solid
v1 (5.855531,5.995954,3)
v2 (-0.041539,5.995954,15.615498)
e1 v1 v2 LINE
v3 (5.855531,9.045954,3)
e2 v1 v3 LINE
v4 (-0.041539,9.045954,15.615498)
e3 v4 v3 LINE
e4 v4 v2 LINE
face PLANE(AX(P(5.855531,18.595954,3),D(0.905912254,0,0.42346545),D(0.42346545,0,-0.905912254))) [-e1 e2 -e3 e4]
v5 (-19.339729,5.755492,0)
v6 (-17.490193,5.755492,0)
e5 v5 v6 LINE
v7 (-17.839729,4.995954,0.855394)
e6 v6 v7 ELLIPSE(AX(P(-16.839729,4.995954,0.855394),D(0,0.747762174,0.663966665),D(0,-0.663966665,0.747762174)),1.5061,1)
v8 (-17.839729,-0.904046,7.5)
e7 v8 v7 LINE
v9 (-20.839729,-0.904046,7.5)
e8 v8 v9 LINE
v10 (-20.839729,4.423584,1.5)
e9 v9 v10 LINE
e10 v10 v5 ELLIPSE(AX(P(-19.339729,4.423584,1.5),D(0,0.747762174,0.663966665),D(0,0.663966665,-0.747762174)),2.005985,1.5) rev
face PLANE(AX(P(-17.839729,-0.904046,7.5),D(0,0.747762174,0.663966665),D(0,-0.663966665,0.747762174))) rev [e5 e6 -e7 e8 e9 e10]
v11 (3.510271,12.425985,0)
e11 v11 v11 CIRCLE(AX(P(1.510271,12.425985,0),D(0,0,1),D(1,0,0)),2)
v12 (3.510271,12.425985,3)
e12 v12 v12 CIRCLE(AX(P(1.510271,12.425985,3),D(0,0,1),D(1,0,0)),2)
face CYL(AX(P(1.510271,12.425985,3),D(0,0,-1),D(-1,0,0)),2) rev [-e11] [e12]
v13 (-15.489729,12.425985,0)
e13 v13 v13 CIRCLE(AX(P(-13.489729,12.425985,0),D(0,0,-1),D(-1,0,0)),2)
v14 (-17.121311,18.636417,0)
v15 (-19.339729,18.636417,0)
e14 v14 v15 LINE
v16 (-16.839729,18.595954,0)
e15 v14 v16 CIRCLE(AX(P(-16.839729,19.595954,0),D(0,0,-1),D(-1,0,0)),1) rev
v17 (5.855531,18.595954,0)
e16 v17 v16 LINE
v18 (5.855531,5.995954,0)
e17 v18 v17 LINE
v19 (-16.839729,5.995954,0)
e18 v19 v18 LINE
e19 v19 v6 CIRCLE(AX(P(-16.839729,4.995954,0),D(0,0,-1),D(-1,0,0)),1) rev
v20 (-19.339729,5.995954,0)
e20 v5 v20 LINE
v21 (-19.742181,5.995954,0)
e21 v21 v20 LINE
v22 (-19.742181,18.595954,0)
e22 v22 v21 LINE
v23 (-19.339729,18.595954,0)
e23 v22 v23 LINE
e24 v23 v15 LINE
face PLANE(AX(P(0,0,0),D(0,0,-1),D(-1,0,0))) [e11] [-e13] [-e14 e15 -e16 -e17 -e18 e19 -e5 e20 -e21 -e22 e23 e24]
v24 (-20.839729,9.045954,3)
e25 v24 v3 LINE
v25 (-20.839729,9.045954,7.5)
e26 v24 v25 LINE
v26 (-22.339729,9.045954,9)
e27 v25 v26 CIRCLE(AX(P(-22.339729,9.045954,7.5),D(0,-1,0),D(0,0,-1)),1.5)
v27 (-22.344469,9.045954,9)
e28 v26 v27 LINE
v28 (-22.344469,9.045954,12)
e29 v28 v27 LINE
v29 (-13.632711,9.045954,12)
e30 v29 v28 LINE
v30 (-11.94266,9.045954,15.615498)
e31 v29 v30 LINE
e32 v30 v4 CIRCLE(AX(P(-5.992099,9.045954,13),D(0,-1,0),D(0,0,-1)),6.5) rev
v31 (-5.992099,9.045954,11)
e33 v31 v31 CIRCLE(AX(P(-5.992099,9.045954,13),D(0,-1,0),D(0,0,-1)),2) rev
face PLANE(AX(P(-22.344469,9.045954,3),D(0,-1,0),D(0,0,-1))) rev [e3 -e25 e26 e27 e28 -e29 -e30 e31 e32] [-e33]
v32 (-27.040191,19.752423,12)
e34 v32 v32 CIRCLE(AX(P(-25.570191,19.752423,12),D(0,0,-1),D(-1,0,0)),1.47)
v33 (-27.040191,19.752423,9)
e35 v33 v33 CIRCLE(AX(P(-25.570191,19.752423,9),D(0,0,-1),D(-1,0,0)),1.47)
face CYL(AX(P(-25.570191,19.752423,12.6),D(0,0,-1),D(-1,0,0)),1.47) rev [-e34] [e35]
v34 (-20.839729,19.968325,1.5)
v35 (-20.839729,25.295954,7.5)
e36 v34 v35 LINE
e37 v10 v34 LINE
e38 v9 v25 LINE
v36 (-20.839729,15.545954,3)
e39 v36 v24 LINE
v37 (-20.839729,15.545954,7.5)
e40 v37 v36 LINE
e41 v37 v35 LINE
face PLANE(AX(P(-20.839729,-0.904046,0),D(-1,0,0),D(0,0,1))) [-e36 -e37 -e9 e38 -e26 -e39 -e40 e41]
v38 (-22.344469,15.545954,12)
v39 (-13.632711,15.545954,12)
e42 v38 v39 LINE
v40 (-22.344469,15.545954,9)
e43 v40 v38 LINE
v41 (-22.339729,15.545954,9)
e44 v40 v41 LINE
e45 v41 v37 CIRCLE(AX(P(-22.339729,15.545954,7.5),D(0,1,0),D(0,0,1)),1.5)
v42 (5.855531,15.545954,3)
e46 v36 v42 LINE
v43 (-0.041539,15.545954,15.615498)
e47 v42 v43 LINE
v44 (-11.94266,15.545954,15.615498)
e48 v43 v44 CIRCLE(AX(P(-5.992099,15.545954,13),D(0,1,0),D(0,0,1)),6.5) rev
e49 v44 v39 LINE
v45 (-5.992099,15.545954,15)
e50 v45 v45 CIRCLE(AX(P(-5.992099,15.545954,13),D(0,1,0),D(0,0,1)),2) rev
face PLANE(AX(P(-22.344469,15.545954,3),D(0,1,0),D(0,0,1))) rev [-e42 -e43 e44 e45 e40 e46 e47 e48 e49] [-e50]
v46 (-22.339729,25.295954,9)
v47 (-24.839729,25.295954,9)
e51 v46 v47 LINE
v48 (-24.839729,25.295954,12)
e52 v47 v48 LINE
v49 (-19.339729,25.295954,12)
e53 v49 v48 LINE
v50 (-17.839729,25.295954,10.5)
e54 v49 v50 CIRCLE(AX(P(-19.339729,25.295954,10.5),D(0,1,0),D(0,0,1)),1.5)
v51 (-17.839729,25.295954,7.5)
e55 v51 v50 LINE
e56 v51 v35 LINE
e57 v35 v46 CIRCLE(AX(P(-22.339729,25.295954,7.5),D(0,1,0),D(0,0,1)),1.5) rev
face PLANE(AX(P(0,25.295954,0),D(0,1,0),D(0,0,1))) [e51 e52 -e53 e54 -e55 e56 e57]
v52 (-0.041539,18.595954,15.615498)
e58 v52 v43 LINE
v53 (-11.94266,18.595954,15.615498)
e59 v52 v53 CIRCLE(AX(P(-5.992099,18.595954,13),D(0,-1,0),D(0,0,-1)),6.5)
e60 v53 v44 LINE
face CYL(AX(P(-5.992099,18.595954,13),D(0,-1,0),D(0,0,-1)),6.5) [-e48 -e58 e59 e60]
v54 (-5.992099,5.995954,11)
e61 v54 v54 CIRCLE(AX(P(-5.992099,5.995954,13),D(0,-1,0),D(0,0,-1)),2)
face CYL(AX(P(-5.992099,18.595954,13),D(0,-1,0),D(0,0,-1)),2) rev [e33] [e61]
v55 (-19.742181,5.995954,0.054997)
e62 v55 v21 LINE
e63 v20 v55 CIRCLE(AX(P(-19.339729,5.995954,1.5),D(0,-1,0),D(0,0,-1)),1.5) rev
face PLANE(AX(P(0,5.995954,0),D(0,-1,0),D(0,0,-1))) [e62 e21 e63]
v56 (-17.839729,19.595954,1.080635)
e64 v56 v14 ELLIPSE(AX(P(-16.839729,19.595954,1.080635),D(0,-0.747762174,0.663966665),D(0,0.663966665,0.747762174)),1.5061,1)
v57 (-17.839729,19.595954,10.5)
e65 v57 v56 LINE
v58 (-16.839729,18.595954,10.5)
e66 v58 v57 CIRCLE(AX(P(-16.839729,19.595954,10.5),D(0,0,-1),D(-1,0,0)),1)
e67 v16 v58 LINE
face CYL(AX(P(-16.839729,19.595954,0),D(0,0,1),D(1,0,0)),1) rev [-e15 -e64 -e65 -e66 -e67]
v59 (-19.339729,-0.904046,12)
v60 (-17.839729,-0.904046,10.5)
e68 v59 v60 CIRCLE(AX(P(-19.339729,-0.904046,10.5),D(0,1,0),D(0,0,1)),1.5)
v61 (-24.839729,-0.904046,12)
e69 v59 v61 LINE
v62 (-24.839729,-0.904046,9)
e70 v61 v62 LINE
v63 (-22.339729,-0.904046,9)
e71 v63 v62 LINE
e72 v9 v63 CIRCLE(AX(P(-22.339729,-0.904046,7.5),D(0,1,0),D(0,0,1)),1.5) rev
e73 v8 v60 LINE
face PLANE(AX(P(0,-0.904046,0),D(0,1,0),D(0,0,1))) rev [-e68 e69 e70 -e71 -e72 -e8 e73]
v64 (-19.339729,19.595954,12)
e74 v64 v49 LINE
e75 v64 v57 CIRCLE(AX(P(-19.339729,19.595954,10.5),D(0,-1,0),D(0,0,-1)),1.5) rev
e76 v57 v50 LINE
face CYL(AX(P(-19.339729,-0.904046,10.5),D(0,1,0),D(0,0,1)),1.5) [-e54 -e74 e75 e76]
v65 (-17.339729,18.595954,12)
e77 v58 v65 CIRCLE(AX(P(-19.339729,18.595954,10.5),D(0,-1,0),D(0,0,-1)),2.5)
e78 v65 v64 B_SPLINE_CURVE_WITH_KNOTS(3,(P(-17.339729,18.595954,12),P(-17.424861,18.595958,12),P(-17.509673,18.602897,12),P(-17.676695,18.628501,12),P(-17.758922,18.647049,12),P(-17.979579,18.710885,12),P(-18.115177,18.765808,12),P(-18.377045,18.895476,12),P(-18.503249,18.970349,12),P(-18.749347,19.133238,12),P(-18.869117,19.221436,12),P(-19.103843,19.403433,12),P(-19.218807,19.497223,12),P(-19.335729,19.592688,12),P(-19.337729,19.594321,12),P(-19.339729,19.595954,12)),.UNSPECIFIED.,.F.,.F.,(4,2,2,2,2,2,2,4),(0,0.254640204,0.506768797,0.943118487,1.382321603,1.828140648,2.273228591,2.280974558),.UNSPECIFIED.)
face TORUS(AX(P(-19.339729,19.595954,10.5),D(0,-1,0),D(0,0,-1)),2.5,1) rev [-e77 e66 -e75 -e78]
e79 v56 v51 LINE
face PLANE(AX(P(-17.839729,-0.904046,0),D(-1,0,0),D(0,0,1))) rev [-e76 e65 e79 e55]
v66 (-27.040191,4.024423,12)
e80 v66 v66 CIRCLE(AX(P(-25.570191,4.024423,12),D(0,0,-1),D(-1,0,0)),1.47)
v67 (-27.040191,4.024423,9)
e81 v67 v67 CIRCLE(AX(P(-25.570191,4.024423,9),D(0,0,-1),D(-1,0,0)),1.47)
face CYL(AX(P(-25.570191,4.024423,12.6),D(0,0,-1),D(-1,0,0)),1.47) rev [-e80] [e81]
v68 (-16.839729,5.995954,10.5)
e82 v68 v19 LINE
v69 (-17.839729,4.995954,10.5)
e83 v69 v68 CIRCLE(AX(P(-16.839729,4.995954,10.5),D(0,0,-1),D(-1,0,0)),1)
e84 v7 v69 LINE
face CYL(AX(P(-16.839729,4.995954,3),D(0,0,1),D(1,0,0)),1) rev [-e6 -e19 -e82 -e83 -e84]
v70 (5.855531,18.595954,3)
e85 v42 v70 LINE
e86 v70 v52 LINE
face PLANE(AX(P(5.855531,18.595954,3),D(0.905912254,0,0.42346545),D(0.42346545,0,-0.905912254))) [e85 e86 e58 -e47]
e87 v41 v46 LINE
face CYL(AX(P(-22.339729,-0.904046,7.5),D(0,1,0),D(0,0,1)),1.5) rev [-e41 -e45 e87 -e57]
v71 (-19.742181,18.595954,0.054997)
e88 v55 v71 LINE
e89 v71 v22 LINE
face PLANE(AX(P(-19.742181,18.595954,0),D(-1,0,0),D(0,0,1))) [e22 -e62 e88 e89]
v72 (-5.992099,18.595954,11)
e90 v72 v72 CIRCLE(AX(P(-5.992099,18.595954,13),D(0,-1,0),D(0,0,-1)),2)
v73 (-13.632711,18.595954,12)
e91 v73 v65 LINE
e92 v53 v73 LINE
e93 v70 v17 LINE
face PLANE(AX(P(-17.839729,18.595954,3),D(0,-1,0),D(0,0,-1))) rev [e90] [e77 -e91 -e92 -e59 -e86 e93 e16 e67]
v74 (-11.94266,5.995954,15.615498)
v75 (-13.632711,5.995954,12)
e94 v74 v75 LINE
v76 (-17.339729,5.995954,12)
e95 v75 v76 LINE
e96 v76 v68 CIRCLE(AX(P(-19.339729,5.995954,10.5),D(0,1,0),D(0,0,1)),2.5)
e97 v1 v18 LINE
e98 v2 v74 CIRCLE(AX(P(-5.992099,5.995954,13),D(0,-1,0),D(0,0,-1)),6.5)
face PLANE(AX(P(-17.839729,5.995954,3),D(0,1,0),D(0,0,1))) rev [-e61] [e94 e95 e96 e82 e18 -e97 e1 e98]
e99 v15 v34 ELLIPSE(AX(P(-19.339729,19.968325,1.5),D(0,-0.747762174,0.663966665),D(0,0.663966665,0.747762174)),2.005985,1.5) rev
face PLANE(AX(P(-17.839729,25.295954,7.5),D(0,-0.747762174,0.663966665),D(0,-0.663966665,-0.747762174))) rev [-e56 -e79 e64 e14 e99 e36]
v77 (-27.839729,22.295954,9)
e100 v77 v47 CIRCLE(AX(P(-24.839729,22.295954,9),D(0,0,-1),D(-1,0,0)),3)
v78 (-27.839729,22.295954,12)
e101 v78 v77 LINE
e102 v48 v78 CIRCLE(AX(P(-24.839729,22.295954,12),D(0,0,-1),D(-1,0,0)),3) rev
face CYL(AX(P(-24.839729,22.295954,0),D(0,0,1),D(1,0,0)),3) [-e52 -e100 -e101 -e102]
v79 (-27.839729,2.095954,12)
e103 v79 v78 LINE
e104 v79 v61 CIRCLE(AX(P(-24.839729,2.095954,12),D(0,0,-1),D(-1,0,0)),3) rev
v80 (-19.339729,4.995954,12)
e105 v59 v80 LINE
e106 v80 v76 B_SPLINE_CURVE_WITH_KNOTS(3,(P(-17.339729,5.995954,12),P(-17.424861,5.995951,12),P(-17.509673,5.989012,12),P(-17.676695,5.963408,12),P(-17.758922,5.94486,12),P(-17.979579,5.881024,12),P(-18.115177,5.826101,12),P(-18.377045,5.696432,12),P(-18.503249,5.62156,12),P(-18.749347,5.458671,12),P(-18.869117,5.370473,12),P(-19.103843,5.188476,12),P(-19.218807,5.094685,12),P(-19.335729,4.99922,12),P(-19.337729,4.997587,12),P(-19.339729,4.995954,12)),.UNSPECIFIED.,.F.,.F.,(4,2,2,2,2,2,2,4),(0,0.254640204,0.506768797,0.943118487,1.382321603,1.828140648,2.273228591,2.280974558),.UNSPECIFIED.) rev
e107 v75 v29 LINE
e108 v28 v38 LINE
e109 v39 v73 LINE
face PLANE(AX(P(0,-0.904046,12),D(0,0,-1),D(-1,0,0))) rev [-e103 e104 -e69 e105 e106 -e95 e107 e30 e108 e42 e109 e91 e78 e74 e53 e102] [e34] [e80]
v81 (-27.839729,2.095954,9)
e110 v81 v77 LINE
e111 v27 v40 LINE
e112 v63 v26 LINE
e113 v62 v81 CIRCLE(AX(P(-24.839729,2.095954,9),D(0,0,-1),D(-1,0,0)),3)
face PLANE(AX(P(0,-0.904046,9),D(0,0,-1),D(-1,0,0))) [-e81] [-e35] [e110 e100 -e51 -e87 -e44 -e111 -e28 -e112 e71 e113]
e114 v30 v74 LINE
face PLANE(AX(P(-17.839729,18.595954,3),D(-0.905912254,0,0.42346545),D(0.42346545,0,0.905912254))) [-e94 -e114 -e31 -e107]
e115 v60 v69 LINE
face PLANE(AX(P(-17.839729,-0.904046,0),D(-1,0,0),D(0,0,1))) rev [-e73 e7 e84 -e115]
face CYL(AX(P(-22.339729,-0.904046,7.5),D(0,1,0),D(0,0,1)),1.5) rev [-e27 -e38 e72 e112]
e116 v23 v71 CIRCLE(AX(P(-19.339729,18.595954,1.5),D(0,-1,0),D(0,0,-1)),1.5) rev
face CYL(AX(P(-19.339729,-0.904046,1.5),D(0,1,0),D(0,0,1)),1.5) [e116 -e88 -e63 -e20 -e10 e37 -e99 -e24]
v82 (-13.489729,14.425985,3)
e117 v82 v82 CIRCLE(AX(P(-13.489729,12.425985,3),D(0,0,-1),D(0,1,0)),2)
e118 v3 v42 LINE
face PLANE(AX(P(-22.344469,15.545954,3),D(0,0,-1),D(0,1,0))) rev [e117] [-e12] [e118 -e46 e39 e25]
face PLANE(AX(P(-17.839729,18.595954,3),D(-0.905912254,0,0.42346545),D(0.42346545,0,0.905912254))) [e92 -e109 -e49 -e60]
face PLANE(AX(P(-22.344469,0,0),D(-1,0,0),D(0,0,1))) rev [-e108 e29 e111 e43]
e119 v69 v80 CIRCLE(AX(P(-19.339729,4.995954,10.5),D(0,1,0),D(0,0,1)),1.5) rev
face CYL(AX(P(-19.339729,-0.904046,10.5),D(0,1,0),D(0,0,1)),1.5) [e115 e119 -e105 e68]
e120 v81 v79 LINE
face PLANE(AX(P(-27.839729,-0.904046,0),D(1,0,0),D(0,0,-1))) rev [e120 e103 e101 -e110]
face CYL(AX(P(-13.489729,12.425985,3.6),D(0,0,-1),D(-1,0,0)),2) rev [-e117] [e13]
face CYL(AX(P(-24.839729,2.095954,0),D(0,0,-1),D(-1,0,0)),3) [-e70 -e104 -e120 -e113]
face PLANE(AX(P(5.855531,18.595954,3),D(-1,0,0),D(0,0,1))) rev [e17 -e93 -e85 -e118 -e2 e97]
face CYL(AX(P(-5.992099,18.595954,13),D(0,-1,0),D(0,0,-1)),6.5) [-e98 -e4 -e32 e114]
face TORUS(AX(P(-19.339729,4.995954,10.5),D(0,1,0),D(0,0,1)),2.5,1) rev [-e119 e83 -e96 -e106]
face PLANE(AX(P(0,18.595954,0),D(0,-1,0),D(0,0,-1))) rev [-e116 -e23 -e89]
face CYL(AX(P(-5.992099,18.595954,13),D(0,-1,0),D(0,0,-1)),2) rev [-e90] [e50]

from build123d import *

# Parameters (mm, degrees)
ESQUISSE1_W             = 23.695260015
ESQUISSE1_H             = 12.6
ESQUISSE1_R             = 2
BOSS_EXTRU_1_DEPTH      = 3
ESQUISSE3_R             = 2
BOSS_EXTRU_2_DEPTH      = 12.6
BOSS_EXTRU_4_DEPTH      = 6.7
BOSS_EXTRU_4_DEPTH_BACK = 19.5
ENL_V_MAT_EXTRU_2_DEPTH = 3
ESQUISSE8_W             = 8.43757856
ESQUISSE8_H             = 12
BOSS_EXTRU_5_DEPTH      = 12.6
ESQUISSE5_W             = 20.633758591
ESQUISSE5_H             = 6.5
ENL_V_MAT_EXTRU_1_DEPTH = 28.2
CONG_3_R                = 1
ESQUISSE9_R             = 2
ENL_V_MAT_EXTRU_3_DEPTH = 3.6
ESQUISSE11_R            = 1.47
ENL_V_MAT_EXTRU_4_DEPTH = 3.6
CONG_4_R                = 3


with BuildPart() as part:
    # Esquisse1 → Boss.-Extru.1 (new body)
    with BuildSketch(Plane.XY):
        with Locations((-5.99209908, 12.295954438)):
            Rectangle(ESQUISSE1_W, ESQUISSE1_H)
        with Locations((-13.489729087, 12.425985115)):
            Circle(ESQUISSE1_R, mode=Mode.SUBTRACT)
        with Locations((1.510270913, 12.425985115)):
            Circle(ESQUISSE1_R, mode=Mode.SUBTRACT)
    extrude(amount=BOSS_EXTRU_1_DEPTH)

    # Esquisse3 → Boss.-Extru.2 (add)
    with BuildSketch(Plane.XZ.offset(-5.995954438)):
        with BuildLine():
            Line((-17.839729087, 3), (5.855530928, 3))
            Line((5.855530928, 3), (-0.041538546, 15.615497913))
            ThreePointArc((-0.041538546, 15.615497913), (-5.99209908, 19.5), (-11.942659613, 15.615497913))
            Line((-11.942659613, 15.615497913), (-17.839729087, 3))
        make_face()
        with Locations(Location((-5.99209908, 13, 0), (0, 0, 270))):
            Circle(ESQUISSE3_R, mode=Mode.SUBTRACT)
    extrude(amount=-BOSS_EXTRU_2_DEPTH)

    # Esquisse6 → Boss.-Extru.4 (add, two sides: drawn at the far end of the back side and taken through both)
    with BuildSketch(Plane(origin=(0, 18.595954438, 0), x_dir=(1, 0, 0), z_dir=(0, 1, 0)).offset(-BOSS_EXTRU_4_DEPTH_BACK)):
        with BuildLine():
            Line((-17.839729087, -3), (-17.839729087, 0))
            Line((-17.839729087, 0), (-19.339729087, 0))
            ThreePointArc((-19.339729087, 0), (-20.400389259, -0.439339828), (-20.839729087, -1.5))
            Line((-20.839729087, -1.5), (-20.839729087, -7.5))
            ThreePointArc((-20.839729087, -7.5), (-21.279068915, -8.560660172), (-22.339729087, -9))
            Line((-22.339729087, -9), (-27.839729087, -9))
            Line((-27.839729087, -9), (-27.839729087, -12))
            Line((-27.839729087, -12), (-19.944823835, -12))
            Line((-19.944823835, -12), (-19.339729087, -12))
            ThreePointArc((-19.339729087, -12), (-18.279068915, -11.560660172), (-17.839729087, -10.5))
            Line((-17.839729087, -10.5), (-17.839729087, -8.3919439))
            Line((-17.839729087, -8.3919439), (-17.839729087, -3))
        make_face()
    extrude(amount=BOSS_EXTRU_4_DEPTH + BOSS_EXTRU_4_DEPTH_BACK)

    # Esquisse7 → Enlèv. mat.-Extru.2 (cut)
    with BuildSketch(Plane.ZY.offset(20.839729087)):
        Polygon((-6.140344815, 12.195954438), (-6.42704232, 7.753847566), (-3.772480019, -6.539015172), (6.059758422, -5.019044791), (7.5, -0.904045562), (-0.069254369, 5.816985209), (-0.466179864, 12.195954438), (-0.069254369, 18.574923667), (7.5, 25.295954438), (6.059758422, 29.410953667), (-3.772480019, 30.930924048), (-6.42704232, 16.638061311), align=None)
    extrude(amount=-ENL_V_MAT_EXTRU_2_DEPTH, mode=Mode.SUBTRACT)

    # Esquisse8 → Boss.-Extru.5 (add)
    with BuildSketch(Plane(origin=(0, 5.995954438, 0), x_dir=(-1, 0, 0), z_dir=(0, -1, 0))):
        with Locations((15.523391269, -6)):
            Rectangle(ESQUISSE8_W, ESQUISSE8_H)
    extrude(amount=-BOSS_EXTRU_5_DEPTH)

    # Esquisse5 → Enlèv. mat.-Extru.1 (cut)
    with BuildSketch(Plane(origin=(5.855530928, 0, 0), x_dir=(0, 0, -1), z_dir=(1, 0, 0))):
        with Locations((-13.316879296, 12.295954438)):
            Rectangle(ESQUISSE5_W, ESQUISSE5_H)
    extrude(amount=-ENL_V_MAT_EXTRU_1_DEPTH, mode=Mode.SUBTRACT)

    # Congé3
    # the kernel refuses this fillet: 1 mm, written as the material it adds along each edge
    with BuildSketch(Plane(origin=(-19.339729087, 18.595954438, 10.5), x_dir=(1, 0, 0), z_dir=(0, 0, -1))) as cong_3_piece_1_section:
        with BuildLine():
            CenterArc((1.5 + CONG_3_R, -CONG_3_R), CONG_3_R, 90, 90)
            Line((1.5, -CONG_3_R), (1.5, 0))
            Line((1.5, 0), (1.5 + CONG_3_R, 0))
        make_face()
    cong_3_piece_1 = revolve(axis=Axis((-19.339729087, 18.595954438, 10.5), (0, -1, 0)), revolution_arc=185.531326158, mode=Mode.PRIVATE)
    cong_3_piece_1 = split(cong_3_piece_1, bisect_by=Plane(origin=(-17.625243019, 18.758648555, 12), z_dir=(0, 0, -1)), keep=Keep.TOP, mode=Mode.PRIVATE)
    add(cong_3_piece_1)
    with BuildSketch(Plane(origin=(-19.339729087, 5.995954438, 10.5), x_dir=(1, 0, 0), z_dir=(0, 0, -1))) as cong_3_piece_2_section:
        with BuildLine():
            CenterArc((1.5 + CONG_3_R, CONG_3_R), CONG_3_R, 180, 90)
            Line((1.5 + CONG_3_R, 0), (1.5, 0))
            Line((1.5, 0), (1.5, CONG_3_R))
        make_face()
    cong_3_piece_2 = revolve(axis=Axis((-19.339729087, 5.995954438, 10.5), (0, -1, 0)), revolution_arc=185.531326158, mode=Mode.PRIVATE)
    cong_3_piece_2 = split(cong_3_piece_2, bisect_by=Plane(origin=(-18.22928563, 5.709154501, 12), z_dir=(0, 0, -1)), keep=Keep.TOP, mode=Mode.PRIVATE)
    add(cong_3_piece_2)
    with BuildSketch(Plane(origin=(-17.839729087, 18.595954438, 0), x_dir=(1, 0, 0), z_dir=(0, 0, 1))) as cong_3_piece_3_section:
        with BuildLine():
            CenterArc((CONG_3_R, CONG_3_R), CONG_3_R, 180, 90)
            Line((0, CONG_3_R), (0, 0))
            Line((0, 0), (CONG_3_R, 0))
        make_face()
    cong_3_piece_3 = extrude(amount=10.5, mode=Mode.PRIVATE)
    cong_3_piece_3 = split(cong_3_piece_3, bisect_by=Plane(origin=(-17.614169597, 21.372960388, 3.081906873), z_dir=(0, -0.7477621735263639, 0.6639666647077458)), keep=Keep.TOP, mode=Mode.PRIVATE)
    add(cong_3_piece_3)
    with BuildSketch(Plane(origin=(-17.839729087, 5.995954438, 0), x_dir=(1, 0, 0), z_dir=(0, 0, 1))) as cong_3_piece_4_section:
        with BuildLine():
            CenterArc((CONG_3_R, -CONG_3_R), CONG_3_R, 90, 90)
            Line((0, -CONG_3_R), (0, 0))
            Line((0, 0), (CONG_3_R, 0))
        make_face()
    cong_3_piece_4 = extrude(amount=10.5, mode=Mode.PRIVATE)
    cong_3_piece_4 = split(cong_3_piece_4, bisect_by=Plane(origin=(-17.615177954, 3.13865295, 2.947095183), z_dir=(0, 0.747762173526364, 0.6639666647077457)), keep=Keep.TOP, mode=Mode.PRIVATE)
    add(cong_3_piece_4)

    # Esquisse9 → Enlèv. mat.-Extru.3 (cut)
    with BuildSketch(Plane(origin=(0, 0, 0), x_dir=(-1, 0, 0), z_dir=(0, 0, -1))):
        with Locations((13.489729087, 12.425985115)):
            Circle(ESQUISSE9_R)
    extrude(amount=-ENL_V_MAT_EXTRU_3_DEPTH, mode=Mode.SUBTRACT)

    # Esquisse11 → Enlèv. mat.-Extru.4 (cut)
    with BuildSketch(Plane(origin=(0, 0, 9), x_dir=(-1, 0, 0), z_dir=(0, 0, -1))):
        with Locations((25.570191421, 4.024422561)):
            Circle(ESQUISSE11_R)
        with Locations((25.570191421, 19.752422561)):
            Circle(ESQUISSE11_R)
    extrude(amount=-ENL_V_MAT_EXTRU_4_DEPTH, mode=Mode.SUBTRACT)

    # Congé4
    cong_4_edges = [part.edges().sort_by_distance(p)[0] for p in [
        (-27.839729087, 25.295954438, 10.5),
        (-27.839729087, -0.904045562, 10.5),
    ]]
    fillet(cong_4_edges, radius=CONG_4_R)


solid = part.part
